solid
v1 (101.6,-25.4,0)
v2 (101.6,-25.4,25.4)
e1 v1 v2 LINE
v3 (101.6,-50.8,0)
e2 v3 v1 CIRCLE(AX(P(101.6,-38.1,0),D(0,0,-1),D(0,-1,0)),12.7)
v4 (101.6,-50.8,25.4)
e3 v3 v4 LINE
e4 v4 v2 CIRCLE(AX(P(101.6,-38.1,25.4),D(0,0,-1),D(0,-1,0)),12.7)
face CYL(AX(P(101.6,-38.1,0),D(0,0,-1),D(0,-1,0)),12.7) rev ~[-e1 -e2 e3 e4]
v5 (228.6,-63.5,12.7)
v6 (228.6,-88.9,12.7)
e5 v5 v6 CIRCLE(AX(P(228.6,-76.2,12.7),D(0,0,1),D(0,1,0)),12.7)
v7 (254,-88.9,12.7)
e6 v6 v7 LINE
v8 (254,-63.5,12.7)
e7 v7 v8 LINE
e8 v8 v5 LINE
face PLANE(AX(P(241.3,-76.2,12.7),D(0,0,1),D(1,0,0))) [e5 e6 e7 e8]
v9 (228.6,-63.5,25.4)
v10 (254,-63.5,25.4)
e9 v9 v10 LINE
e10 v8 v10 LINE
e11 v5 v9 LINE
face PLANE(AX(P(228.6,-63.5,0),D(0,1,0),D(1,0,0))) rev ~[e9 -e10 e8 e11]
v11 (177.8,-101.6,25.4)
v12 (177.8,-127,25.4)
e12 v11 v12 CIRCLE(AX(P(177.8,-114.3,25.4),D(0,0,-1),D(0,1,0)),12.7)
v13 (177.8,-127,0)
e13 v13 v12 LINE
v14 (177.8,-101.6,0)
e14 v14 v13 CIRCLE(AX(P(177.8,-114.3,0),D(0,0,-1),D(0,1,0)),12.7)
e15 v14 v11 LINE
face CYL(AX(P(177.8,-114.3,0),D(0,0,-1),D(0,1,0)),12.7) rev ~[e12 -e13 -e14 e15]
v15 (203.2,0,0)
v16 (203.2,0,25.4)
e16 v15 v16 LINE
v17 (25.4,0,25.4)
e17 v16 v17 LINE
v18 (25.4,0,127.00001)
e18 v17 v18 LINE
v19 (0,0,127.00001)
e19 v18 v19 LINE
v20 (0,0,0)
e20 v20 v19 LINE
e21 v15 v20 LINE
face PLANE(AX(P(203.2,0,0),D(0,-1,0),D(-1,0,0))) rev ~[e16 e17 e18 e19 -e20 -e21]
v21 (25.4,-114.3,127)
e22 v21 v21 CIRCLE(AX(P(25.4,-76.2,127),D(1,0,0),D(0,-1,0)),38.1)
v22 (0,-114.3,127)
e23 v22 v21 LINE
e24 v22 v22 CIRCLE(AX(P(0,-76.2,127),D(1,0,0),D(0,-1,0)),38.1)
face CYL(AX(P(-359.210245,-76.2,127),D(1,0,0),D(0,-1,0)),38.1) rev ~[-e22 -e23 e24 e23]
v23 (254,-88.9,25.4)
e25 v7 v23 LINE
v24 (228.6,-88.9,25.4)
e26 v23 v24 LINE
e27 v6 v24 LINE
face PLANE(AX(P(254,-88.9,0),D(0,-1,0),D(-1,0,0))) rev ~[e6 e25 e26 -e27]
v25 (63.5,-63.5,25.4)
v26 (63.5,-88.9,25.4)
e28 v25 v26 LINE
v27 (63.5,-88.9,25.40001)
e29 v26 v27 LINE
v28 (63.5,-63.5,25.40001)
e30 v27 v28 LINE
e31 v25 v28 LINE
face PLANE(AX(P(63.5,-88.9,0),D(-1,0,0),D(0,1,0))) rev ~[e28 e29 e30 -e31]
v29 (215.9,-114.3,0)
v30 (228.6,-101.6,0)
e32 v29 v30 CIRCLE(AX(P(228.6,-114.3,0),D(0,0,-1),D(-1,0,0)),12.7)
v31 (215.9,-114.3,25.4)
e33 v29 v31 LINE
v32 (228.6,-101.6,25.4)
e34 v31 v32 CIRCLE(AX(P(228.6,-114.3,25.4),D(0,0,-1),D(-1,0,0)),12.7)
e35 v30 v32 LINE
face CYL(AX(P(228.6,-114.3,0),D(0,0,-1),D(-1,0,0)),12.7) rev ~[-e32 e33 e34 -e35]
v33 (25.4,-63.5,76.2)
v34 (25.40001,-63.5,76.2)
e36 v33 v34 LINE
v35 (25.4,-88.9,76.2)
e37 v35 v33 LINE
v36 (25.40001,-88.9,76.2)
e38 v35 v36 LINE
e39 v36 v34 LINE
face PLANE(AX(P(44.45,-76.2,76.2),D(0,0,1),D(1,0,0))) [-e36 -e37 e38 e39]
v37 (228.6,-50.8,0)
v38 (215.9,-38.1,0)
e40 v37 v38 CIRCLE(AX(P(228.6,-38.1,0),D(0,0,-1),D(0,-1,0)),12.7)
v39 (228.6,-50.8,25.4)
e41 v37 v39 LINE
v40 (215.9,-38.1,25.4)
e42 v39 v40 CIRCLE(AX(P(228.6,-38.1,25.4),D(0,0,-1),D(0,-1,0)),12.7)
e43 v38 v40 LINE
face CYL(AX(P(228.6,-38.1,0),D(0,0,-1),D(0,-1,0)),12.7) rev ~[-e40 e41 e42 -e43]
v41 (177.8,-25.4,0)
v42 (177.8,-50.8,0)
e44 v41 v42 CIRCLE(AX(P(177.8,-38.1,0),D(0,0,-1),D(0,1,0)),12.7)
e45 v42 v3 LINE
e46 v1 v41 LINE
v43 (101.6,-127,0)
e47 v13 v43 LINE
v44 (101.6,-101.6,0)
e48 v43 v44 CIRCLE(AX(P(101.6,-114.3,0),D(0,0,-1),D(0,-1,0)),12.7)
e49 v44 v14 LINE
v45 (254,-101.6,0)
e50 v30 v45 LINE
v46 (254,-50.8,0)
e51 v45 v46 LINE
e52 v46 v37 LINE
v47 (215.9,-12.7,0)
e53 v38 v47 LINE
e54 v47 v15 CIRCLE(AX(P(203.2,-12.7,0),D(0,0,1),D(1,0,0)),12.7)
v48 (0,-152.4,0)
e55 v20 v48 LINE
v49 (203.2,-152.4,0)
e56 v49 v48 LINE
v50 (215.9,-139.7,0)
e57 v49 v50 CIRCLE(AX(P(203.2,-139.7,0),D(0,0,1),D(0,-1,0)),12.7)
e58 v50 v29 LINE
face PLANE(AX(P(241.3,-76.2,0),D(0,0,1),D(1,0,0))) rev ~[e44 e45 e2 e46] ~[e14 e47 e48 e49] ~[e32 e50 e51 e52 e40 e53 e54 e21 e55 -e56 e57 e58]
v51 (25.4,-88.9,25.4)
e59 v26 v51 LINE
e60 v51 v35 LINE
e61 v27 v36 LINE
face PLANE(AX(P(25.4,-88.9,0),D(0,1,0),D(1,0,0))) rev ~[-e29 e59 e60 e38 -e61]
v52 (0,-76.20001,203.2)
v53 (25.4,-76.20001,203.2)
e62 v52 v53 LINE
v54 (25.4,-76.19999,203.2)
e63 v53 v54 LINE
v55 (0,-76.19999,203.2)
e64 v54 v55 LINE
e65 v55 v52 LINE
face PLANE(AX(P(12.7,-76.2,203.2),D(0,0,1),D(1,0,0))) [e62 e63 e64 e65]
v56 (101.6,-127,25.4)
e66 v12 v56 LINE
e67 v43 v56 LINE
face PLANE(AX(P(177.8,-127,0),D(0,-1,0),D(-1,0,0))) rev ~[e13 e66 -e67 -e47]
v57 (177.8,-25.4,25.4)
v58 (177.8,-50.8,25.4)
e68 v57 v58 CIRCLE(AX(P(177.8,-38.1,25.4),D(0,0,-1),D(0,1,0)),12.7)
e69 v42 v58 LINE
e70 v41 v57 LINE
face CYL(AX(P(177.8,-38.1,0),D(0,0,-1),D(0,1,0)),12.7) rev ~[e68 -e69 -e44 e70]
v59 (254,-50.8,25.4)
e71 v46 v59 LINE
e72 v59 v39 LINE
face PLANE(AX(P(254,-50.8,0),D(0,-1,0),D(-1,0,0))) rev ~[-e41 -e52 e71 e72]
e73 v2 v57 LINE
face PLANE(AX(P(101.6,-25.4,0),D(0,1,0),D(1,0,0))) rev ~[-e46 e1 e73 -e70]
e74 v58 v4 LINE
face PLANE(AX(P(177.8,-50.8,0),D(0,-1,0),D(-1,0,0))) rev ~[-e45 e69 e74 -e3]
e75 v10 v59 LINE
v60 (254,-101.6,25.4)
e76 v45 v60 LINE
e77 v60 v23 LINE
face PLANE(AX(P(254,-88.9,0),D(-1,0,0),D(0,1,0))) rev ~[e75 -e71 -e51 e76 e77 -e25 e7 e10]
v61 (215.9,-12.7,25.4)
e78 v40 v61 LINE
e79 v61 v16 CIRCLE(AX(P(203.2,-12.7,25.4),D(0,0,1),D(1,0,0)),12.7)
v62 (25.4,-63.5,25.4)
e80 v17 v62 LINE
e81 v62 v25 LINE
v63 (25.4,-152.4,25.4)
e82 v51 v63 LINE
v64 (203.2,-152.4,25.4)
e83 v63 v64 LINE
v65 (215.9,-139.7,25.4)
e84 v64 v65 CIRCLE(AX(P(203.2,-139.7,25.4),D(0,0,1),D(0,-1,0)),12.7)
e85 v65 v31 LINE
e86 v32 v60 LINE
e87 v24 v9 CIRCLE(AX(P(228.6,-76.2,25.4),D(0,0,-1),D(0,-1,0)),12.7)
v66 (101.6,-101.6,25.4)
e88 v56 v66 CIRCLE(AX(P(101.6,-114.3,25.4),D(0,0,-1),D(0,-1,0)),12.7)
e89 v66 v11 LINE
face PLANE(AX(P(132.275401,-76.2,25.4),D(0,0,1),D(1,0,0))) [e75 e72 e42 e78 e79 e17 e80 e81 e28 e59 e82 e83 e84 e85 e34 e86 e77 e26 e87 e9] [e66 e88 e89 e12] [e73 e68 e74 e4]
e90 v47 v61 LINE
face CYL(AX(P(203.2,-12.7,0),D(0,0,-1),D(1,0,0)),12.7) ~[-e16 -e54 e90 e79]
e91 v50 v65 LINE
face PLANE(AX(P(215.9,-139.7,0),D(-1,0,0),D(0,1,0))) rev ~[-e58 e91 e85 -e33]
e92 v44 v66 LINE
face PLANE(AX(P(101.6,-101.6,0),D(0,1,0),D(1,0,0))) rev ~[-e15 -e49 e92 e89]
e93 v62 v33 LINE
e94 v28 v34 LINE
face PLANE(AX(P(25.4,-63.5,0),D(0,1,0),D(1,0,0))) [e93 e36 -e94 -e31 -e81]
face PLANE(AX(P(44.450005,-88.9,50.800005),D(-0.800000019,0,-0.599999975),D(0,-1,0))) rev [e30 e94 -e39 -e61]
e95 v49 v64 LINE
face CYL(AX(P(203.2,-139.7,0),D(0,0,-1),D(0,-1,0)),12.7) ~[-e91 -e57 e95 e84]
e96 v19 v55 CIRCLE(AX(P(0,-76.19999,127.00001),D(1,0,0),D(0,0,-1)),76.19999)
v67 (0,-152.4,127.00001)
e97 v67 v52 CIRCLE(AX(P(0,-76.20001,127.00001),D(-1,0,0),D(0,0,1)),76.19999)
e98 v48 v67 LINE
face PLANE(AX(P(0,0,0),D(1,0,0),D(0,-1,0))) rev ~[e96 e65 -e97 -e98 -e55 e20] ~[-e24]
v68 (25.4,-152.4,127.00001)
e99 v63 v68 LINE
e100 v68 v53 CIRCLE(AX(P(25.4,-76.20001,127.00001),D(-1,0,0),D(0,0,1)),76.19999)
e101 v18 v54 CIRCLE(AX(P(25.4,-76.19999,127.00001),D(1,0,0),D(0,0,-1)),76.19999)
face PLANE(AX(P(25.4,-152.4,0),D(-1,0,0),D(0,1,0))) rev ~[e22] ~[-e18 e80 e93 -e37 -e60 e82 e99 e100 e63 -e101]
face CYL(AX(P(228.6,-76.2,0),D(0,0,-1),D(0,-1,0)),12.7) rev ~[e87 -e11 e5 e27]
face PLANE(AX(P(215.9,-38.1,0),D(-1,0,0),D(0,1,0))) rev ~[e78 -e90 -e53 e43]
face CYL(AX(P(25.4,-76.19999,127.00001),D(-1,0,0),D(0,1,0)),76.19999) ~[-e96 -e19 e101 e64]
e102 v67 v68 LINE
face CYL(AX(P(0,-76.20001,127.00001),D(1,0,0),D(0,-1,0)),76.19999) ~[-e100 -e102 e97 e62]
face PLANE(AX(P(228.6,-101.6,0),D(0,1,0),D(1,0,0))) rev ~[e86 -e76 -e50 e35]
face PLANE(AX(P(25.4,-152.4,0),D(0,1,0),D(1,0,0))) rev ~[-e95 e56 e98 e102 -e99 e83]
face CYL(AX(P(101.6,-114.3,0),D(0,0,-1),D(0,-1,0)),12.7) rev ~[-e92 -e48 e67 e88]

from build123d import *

# Parameters (mm, degrees)
F1_DEPTH = 203.2
F2_DEPTH = 25.4
F3_DEPTH = 12.7
F0_W     = 38.1
F0_H     = 25.4
F4_DEPTH = 76.2
F6_R     = 76.19999
F7_D     = 76.2
F8_SIZE2 = 38.09999
F8_SIZE  = 50.79999


# Not quite as in the source:
# - a fillet or chamfer is up to 0.001 mm smaller than in the source, because OpenCascade refuses the exact size


with BuildPart() as f1:
    # F0 (on Top) → F1 (new body)
    with BuildSketch(Plane.XY):
        Polygon((25.4, 0), (0, 0), (0, -152.4), (25.4, -152.4), (25.4, -88.9), (25.4, -63.5), align=None)
    extrude(amount=F1_DEPTH)

    # F0 (on Top) → F2 (join)
    with BuildSketch(Plane.XY):
        with BuildLine():
            Line((101.6, 0), (25.4, 0))
            Line((25.4, 0), (25.4, -63.5))
            Line((25.4, -63.5), (63.5, -63.5))
            Line((63.5, -63.5), (63.5, -88.9))
            Line((63.5, -88.9), (25.4, -88.9))
            Line((25.4, -88.9), (25.4, -152.4))
            Line((25.4, -152.4), (101.6, -152.4))
            Line((101.6, -152.4), (203.2, -152.4))
            ThreePointArc((203.2, -152.4), (212.1802561211, -148.6802561211), (215.9, -139.7))
            Line((215.9, -139.7), (215.9, -114.3))
            ThreePointArc((215.9, -114.3), (219.6197438789, -105.3197438789), (228.6, -101.6))
            Line((228.6, -101.6), (254, -101.6))
            Line((254, -101.6), (254, -88.9))
            Line((254, -88.9), (228.6, -88.9))
            ThreePointArc((228.6, -88.9), (215.9, -76.2), (228.6, -63.5))
            Line((228.6, -63.5), (254, -63.5))
            Line((254, -63.5), (254, -50.8))
            Line((254, -50.8), (228.6, -50.8))
            ThreePointArc((228.6, -50.8), (219.6197438789, -47.0802561211), (215.9, -38.1))
            Line((215.9, -38.1), (215.9, -12.7))
            ThreePointArc((215.9, -12.7), (212.1802561211, -3.7197438789), (203.2, 0))
            Line((203.2, 0), (101.6, 0))
        make_face()
        with BuildLine():
            Line((177.8, -127), (101.6, -127))
            ThreePointArc((101.6, -127), (88.9, -114.3), (101.6, -101.6))
            Line((101.6, -101.6), (177.8, -101.6))
            ThreePointArc((177.8, -101.6), (190.5, -114.3), (177.8, -127))
        make_face(mode=Mode.SUBTRACT)
        with BuildLine():
            ThreePointArc((101.6, -50.8), (88.9, -38.1), (101.6, -25.4))
            Line((101.6, -25.4), (177.8, -25.4))
            ThreePointArc((177.8, -25.4), (190.5, -38.1), (177.8, -50.8))
            Line((177.8, -50.8), (101.6, -50.8))
        make_face(mode=Mode.SUBTRACT)
    extrude(amount=F2_DEPTH)

    # F0 (on Top) → F3 (join)
    with BuildSketch(Plane.XY):
        Polygon((254, -88.9), (254, -63.5), (228.6, -63.5), (228.6, -76.2), (228.6, -88.9), align=None)
        with BuildLine():
            Line((228.6, -76.2), (228.6, -63.5))
            ThreePointArc((228.6, -63.5), (215.9, -76.2), (228.6, -88.9))
            Line((228.6, -88.9), (228.6, -76.2))
        make_face()
    extrude(amount=F3_DEPTH)

    # F0 (on Top) → F4 (join)
    with BuildSketch(Plane.XY):
        with Locations((44.45, -76.2)):
            Rectangle(F0_W, F0_H)
    extrude(amount=F4_DEPTH)

    # F6 (radius 76.2 in the source; OpenCascade refuses exactly that, so slightly less here)
    f6_edges = [f1.edges().sort_by_distance(p)[0] for p in [
        (12.7, -152.4, 203.2),
        (12.7, 0, 203.2),
    ]]
    fillet(f6_edges, radius=F6_R)

    # F7 (through all)
    with Locations(Plane(origin=(0, 0, 0), x_dir=(0, 1, 0), z_dir=(-1, 0, 0))):
        with Locations((-76.2, -127)):
            Hole(F7_D / 2)

    # F8 (size 50.8 and 38.0999999365 in the source; OpenCascade refuses exactly that, so slightly less here)
    f8_edges = [f1.edges().sort_by_distance(p)[0] for p in [
        (63.5, -76.2, 76.2),
    ]]
    f8_side = f1.faces().sort_by_distance((63.5, -76.2, 50.8))[0]
    chamfer(f8_edges, length=F8_SIZE, length2=F8_SIZE2, reference=f8_side)


solid = f1.part
